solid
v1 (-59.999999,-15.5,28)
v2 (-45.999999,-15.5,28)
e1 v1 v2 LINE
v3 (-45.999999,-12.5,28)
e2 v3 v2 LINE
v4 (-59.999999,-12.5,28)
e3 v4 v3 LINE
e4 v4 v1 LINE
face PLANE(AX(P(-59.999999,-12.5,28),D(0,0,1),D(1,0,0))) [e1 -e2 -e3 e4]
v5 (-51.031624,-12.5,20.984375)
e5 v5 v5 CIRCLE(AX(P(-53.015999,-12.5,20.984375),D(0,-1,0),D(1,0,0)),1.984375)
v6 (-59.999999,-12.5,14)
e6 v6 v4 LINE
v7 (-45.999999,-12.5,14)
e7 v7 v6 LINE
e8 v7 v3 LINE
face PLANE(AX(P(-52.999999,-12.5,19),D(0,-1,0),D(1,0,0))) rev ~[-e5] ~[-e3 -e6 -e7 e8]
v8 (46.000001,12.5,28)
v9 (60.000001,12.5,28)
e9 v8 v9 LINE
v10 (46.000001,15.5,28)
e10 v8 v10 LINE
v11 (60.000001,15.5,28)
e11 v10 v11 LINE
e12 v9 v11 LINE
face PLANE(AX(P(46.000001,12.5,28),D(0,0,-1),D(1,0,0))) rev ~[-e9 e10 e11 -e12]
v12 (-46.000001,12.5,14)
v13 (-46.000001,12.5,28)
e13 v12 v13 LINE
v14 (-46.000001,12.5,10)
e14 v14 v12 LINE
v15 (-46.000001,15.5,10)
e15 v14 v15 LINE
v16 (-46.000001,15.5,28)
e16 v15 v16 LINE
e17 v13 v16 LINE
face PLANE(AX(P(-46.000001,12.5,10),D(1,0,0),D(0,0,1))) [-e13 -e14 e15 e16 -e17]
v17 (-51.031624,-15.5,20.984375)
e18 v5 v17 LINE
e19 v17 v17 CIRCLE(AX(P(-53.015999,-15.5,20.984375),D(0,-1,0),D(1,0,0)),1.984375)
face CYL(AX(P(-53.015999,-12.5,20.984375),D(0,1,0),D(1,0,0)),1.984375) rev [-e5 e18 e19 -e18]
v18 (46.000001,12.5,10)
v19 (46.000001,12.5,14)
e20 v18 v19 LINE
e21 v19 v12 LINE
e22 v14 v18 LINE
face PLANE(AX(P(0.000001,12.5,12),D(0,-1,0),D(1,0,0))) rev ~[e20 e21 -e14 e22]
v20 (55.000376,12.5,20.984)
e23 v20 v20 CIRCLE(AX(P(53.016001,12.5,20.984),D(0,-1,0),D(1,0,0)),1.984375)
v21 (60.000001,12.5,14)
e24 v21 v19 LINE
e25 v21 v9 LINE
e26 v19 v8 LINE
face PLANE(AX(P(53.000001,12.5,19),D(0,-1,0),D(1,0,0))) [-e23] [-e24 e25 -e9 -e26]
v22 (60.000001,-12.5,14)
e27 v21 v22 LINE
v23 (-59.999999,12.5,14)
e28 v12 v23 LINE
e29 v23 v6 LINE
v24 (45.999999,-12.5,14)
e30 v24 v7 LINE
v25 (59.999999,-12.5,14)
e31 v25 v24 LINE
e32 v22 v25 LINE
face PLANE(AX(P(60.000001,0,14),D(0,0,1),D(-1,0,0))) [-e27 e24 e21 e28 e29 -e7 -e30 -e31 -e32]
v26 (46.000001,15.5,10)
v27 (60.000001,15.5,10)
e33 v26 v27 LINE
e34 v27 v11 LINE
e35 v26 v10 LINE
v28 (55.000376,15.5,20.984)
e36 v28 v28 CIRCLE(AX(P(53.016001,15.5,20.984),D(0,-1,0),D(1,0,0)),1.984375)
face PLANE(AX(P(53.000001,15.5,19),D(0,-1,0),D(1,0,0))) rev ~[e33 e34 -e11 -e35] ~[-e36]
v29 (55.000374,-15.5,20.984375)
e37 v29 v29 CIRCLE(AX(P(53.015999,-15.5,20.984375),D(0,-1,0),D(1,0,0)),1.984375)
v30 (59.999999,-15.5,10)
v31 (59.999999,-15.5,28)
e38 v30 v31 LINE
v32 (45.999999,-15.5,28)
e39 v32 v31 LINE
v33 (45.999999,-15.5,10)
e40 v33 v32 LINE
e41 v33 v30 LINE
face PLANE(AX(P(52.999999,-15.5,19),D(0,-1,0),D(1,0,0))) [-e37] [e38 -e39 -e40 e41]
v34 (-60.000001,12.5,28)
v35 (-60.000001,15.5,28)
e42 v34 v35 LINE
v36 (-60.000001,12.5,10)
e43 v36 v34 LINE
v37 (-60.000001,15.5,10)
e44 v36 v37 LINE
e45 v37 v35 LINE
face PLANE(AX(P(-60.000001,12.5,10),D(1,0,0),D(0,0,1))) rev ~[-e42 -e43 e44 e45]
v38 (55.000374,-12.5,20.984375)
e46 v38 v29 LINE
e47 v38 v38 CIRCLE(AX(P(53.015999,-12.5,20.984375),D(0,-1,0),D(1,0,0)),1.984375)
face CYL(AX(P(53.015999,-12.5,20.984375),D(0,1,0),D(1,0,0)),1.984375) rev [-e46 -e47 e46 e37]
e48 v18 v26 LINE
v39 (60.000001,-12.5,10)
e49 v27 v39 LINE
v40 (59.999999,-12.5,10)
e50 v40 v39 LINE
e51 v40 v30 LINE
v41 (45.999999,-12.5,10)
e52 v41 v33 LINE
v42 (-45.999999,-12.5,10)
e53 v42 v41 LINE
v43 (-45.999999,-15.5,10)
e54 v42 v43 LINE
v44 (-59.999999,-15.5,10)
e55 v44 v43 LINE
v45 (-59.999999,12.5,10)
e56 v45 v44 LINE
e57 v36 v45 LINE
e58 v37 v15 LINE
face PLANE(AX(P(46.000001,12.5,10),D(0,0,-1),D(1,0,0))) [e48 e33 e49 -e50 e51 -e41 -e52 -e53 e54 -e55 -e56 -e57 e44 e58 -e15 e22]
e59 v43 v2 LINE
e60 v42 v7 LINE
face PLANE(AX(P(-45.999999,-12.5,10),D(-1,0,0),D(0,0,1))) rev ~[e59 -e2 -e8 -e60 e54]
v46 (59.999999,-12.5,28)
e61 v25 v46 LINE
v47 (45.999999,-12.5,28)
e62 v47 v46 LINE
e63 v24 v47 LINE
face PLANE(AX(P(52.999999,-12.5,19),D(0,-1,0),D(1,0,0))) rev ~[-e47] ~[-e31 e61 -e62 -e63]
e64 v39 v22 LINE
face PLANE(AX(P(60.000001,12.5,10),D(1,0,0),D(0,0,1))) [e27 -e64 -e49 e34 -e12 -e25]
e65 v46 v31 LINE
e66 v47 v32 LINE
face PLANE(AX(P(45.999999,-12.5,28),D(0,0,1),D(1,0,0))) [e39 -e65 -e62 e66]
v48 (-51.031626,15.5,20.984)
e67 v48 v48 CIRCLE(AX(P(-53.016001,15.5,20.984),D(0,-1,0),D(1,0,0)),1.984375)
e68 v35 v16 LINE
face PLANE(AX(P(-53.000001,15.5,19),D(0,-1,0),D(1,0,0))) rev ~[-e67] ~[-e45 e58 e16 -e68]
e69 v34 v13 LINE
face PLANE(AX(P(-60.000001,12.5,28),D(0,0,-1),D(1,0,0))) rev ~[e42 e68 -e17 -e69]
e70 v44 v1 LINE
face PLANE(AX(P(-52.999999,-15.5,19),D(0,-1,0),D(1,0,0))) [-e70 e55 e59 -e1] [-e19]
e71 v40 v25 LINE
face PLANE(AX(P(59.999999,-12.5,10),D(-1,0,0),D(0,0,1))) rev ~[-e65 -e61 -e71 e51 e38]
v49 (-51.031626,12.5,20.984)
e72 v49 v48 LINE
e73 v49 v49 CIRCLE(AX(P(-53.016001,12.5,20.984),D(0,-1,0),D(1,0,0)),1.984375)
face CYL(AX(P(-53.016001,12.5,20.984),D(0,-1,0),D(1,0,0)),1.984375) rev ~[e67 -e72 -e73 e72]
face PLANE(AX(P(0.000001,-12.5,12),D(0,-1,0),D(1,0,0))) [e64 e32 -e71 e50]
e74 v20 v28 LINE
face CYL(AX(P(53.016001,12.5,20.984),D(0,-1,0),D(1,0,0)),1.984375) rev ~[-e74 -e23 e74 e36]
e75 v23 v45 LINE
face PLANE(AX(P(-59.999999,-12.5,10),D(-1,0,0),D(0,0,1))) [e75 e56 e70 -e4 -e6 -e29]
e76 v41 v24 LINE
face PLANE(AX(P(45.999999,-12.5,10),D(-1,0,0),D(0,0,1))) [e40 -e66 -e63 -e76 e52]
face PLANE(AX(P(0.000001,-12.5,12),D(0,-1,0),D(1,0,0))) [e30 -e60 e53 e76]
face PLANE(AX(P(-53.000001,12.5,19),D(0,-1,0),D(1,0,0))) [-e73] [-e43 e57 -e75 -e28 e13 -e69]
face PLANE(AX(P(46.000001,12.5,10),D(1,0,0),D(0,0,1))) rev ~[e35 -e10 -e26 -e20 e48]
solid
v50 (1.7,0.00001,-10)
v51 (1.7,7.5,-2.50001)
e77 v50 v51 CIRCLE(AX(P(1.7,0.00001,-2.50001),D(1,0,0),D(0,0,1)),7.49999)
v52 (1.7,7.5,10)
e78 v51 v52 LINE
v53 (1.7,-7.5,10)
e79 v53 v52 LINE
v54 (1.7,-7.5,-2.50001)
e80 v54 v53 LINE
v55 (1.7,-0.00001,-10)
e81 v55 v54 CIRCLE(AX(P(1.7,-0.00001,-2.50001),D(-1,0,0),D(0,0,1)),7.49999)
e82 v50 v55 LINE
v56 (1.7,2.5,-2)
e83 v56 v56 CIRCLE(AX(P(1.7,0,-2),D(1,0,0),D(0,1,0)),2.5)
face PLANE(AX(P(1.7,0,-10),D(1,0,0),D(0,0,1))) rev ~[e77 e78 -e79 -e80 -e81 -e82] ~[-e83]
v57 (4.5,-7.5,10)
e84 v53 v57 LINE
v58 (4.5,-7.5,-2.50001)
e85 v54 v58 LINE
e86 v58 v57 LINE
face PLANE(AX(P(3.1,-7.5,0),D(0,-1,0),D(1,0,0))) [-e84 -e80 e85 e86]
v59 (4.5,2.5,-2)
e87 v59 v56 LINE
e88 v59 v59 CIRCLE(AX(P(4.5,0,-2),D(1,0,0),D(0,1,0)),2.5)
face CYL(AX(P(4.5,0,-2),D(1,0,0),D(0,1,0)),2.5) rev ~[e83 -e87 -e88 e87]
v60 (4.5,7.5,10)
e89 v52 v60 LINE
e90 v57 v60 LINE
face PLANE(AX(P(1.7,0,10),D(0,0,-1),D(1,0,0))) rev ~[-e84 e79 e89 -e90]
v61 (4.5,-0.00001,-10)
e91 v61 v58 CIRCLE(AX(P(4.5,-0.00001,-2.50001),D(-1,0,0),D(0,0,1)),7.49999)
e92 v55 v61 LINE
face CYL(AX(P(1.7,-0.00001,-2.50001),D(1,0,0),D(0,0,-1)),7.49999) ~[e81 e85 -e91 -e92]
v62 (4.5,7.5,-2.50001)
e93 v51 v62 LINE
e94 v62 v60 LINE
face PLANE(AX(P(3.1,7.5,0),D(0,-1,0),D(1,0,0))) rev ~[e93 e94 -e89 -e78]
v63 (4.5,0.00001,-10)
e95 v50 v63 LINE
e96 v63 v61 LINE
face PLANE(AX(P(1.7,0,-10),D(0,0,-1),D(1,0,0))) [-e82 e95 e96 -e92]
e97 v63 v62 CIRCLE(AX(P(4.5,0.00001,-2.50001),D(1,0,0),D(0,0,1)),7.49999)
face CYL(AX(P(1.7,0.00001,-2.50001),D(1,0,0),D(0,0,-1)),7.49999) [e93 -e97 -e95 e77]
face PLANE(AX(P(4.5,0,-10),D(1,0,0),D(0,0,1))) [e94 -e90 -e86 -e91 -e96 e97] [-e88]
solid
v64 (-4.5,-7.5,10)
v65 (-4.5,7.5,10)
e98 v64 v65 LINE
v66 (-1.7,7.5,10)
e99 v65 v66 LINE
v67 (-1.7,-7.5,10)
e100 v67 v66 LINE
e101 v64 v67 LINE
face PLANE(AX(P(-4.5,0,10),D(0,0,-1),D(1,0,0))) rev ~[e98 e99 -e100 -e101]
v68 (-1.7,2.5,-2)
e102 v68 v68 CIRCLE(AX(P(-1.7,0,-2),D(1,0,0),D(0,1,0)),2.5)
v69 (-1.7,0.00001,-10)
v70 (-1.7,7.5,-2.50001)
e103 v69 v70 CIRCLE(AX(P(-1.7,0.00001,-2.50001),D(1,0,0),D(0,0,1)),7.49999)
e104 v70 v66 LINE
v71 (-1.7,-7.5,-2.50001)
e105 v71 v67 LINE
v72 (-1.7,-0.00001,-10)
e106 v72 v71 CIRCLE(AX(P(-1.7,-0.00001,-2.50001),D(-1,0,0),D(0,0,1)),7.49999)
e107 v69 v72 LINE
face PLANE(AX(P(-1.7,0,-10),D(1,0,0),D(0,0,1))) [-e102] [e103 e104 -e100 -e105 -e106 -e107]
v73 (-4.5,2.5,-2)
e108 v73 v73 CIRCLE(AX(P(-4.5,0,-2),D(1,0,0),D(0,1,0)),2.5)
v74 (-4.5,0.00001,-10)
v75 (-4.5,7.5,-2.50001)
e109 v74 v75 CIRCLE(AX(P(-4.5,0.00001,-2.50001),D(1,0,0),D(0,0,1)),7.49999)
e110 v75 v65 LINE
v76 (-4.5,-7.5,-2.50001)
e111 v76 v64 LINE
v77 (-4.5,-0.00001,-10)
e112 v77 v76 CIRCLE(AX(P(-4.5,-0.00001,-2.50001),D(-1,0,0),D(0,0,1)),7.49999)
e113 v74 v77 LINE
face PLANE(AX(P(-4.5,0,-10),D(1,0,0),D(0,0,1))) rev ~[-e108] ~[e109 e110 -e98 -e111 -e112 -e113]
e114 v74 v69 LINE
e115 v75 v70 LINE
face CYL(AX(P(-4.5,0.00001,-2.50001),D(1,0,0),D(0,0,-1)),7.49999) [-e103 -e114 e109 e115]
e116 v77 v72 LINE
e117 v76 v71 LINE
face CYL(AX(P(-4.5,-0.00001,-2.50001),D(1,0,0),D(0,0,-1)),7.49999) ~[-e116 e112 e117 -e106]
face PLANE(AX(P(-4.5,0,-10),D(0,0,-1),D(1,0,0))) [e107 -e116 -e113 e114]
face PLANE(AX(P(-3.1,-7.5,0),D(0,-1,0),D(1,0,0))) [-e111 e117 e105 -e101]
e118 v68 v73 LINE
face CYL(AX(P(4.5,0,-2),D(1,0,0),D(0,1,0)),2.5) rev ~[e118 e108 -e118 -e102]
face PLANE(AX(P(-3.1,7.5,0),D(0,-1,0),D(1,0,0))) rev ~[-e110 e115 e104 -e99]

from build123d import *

# Parameters (mm, degrees)
F0_W      = 2.8
F0_H      = 20
F1_DEPTH  = 7.5
F3_R      = 2.5
F4_DEPTH  = 9.001
F5_R      = 7.49999
F5_2_R    = 7.49999
F6_DEPTH  = 12.5
F8_W      = 14
F8_H      = 18
F8_R      = 1.984375
F9_DEPTH  = 3
F11_W     = 14
F11_H     = 18
F11_R     = 1.984375
F12_DEPTH = 3


# Not quite as in the source:
# - a fillet or chamfer is up to 0.001 mm smaller than in the source, because OpenCascade refuses the exact size


with BuildPart() as f1:
    # F0 (on Front) → F1 (new body, symmetric)
    with BuildSketch(Plane.XZ):
        with Locations((-3.1, 0)):
            Rectangle(F0_W, F0_H)
    extrude(amount=F1_DEPTH, both=True)


with BuildPart() as f1b:
    # F0 (on Front) → F1, piece 2 (new body, symmetric)
    with BuildSketch(Plane.XZ):
        with Locations((3.1, 0)):
            Rectangle(F0_W, F0_H)
    extrude(amount=F1_DEPTH, both=True)


with BuildPart() as f4_tool:
    # F3 (on offset) → F4 (new body, through all)
    with BuildSketch(Plane.YZ.offset(4.5)):
        with Locations((0, -2)):
            Circle(F3_R)
    extrude(amount=-F4_DEPTH)


with BuildPart() as f1_1:
    add(f1.part)

    # F4: cut by f4_tool
    add(f4_tool.part, mode=Mode.SUBTRACT)

    # F5#2 (radius 7.5 in the source; OpenCascade refuses exactly that, so slightly less here)
    f5_2_edges = [f1_1.edges().sort_by_distance(p)[0] for p in [
        (-3.1, -7.5, -10),
        (-3.1, 7.5, -10),
    ]]
    fillet(f5_2_edges, radius=F5_2_R)


with BuildPart() as f1b_1:
    add(f1b.part)

    # F4: cut by f4_tool
    add(f4_tool.part, mode=Mode.SUBTRACT)

    # F5 (radius 7.5 in the source; OpenCascade refuses exactly that, so slightly less here)
    f5_edges = [f1b_1.edges().sort_by_distance(p)[0] for p in [
        (3.1, -7.5, -10),
        (3.1, 7.5, -10),
    ]]
    fillet(f5_edges, radius=F5_R)


with BuildPart() as f6:
    # F0 (on Front) → F6 (new body, symmetric)
    with BuildSketch(Plane.XZ):
        Polygon((-1.7, 10), (1.7, 10), (4.5, 10), (60.0000013411, 10), (60.0000013411, 14), (-59.9999986589, 14), (-59.9999986589, 10), (-4.5, 10), align=None)
    extrude(amount=F6_DEPTH, both=True)

    # F8 (on offset) → F9 (join)
    with BuildSketch(Plane.XZ.offset(12.5)):
        with Locations((-52.9999986589, 19)):
            Rectangle(F8_W, F8_H)
        with Locations((-53.0159986589, 20.984375)):
            Circle(F8_R, mode=Mode.SUBTRACT)
        with Locations((52.9999986589, 19)):
            Rectangle(F8_W, F8_H)
        with Locations((53.0159986589, 20.984375)):
            Circle(F8_R, mode=Mode.SUBTRACT)
    extrude(amount=F9_DEPTH)

    # F11 (on offset) → F12 (join)
    with BuildSketch(Plane.XZ.offset(-12.5)):
        with Locations((53.0000013411, 19)):
            Rectangle(F11_W, F11_H)
        with Locations((53.0160013411, 20.984)):
            Circle(F11_R, mode=Mode.SUBTRACT)
        with Locations((-53.0000013411, 19)):
            Rectangle(F11_W, F11_H)
        with Locations((-53.0160013411, 20.984)):
            Circle(F11_R, mode=Mode.SUBTRACT)
    extrude(amount=-F12_DEPTH)


solid = Compound([f1_1.part, f1b_1.part, f6.part])
